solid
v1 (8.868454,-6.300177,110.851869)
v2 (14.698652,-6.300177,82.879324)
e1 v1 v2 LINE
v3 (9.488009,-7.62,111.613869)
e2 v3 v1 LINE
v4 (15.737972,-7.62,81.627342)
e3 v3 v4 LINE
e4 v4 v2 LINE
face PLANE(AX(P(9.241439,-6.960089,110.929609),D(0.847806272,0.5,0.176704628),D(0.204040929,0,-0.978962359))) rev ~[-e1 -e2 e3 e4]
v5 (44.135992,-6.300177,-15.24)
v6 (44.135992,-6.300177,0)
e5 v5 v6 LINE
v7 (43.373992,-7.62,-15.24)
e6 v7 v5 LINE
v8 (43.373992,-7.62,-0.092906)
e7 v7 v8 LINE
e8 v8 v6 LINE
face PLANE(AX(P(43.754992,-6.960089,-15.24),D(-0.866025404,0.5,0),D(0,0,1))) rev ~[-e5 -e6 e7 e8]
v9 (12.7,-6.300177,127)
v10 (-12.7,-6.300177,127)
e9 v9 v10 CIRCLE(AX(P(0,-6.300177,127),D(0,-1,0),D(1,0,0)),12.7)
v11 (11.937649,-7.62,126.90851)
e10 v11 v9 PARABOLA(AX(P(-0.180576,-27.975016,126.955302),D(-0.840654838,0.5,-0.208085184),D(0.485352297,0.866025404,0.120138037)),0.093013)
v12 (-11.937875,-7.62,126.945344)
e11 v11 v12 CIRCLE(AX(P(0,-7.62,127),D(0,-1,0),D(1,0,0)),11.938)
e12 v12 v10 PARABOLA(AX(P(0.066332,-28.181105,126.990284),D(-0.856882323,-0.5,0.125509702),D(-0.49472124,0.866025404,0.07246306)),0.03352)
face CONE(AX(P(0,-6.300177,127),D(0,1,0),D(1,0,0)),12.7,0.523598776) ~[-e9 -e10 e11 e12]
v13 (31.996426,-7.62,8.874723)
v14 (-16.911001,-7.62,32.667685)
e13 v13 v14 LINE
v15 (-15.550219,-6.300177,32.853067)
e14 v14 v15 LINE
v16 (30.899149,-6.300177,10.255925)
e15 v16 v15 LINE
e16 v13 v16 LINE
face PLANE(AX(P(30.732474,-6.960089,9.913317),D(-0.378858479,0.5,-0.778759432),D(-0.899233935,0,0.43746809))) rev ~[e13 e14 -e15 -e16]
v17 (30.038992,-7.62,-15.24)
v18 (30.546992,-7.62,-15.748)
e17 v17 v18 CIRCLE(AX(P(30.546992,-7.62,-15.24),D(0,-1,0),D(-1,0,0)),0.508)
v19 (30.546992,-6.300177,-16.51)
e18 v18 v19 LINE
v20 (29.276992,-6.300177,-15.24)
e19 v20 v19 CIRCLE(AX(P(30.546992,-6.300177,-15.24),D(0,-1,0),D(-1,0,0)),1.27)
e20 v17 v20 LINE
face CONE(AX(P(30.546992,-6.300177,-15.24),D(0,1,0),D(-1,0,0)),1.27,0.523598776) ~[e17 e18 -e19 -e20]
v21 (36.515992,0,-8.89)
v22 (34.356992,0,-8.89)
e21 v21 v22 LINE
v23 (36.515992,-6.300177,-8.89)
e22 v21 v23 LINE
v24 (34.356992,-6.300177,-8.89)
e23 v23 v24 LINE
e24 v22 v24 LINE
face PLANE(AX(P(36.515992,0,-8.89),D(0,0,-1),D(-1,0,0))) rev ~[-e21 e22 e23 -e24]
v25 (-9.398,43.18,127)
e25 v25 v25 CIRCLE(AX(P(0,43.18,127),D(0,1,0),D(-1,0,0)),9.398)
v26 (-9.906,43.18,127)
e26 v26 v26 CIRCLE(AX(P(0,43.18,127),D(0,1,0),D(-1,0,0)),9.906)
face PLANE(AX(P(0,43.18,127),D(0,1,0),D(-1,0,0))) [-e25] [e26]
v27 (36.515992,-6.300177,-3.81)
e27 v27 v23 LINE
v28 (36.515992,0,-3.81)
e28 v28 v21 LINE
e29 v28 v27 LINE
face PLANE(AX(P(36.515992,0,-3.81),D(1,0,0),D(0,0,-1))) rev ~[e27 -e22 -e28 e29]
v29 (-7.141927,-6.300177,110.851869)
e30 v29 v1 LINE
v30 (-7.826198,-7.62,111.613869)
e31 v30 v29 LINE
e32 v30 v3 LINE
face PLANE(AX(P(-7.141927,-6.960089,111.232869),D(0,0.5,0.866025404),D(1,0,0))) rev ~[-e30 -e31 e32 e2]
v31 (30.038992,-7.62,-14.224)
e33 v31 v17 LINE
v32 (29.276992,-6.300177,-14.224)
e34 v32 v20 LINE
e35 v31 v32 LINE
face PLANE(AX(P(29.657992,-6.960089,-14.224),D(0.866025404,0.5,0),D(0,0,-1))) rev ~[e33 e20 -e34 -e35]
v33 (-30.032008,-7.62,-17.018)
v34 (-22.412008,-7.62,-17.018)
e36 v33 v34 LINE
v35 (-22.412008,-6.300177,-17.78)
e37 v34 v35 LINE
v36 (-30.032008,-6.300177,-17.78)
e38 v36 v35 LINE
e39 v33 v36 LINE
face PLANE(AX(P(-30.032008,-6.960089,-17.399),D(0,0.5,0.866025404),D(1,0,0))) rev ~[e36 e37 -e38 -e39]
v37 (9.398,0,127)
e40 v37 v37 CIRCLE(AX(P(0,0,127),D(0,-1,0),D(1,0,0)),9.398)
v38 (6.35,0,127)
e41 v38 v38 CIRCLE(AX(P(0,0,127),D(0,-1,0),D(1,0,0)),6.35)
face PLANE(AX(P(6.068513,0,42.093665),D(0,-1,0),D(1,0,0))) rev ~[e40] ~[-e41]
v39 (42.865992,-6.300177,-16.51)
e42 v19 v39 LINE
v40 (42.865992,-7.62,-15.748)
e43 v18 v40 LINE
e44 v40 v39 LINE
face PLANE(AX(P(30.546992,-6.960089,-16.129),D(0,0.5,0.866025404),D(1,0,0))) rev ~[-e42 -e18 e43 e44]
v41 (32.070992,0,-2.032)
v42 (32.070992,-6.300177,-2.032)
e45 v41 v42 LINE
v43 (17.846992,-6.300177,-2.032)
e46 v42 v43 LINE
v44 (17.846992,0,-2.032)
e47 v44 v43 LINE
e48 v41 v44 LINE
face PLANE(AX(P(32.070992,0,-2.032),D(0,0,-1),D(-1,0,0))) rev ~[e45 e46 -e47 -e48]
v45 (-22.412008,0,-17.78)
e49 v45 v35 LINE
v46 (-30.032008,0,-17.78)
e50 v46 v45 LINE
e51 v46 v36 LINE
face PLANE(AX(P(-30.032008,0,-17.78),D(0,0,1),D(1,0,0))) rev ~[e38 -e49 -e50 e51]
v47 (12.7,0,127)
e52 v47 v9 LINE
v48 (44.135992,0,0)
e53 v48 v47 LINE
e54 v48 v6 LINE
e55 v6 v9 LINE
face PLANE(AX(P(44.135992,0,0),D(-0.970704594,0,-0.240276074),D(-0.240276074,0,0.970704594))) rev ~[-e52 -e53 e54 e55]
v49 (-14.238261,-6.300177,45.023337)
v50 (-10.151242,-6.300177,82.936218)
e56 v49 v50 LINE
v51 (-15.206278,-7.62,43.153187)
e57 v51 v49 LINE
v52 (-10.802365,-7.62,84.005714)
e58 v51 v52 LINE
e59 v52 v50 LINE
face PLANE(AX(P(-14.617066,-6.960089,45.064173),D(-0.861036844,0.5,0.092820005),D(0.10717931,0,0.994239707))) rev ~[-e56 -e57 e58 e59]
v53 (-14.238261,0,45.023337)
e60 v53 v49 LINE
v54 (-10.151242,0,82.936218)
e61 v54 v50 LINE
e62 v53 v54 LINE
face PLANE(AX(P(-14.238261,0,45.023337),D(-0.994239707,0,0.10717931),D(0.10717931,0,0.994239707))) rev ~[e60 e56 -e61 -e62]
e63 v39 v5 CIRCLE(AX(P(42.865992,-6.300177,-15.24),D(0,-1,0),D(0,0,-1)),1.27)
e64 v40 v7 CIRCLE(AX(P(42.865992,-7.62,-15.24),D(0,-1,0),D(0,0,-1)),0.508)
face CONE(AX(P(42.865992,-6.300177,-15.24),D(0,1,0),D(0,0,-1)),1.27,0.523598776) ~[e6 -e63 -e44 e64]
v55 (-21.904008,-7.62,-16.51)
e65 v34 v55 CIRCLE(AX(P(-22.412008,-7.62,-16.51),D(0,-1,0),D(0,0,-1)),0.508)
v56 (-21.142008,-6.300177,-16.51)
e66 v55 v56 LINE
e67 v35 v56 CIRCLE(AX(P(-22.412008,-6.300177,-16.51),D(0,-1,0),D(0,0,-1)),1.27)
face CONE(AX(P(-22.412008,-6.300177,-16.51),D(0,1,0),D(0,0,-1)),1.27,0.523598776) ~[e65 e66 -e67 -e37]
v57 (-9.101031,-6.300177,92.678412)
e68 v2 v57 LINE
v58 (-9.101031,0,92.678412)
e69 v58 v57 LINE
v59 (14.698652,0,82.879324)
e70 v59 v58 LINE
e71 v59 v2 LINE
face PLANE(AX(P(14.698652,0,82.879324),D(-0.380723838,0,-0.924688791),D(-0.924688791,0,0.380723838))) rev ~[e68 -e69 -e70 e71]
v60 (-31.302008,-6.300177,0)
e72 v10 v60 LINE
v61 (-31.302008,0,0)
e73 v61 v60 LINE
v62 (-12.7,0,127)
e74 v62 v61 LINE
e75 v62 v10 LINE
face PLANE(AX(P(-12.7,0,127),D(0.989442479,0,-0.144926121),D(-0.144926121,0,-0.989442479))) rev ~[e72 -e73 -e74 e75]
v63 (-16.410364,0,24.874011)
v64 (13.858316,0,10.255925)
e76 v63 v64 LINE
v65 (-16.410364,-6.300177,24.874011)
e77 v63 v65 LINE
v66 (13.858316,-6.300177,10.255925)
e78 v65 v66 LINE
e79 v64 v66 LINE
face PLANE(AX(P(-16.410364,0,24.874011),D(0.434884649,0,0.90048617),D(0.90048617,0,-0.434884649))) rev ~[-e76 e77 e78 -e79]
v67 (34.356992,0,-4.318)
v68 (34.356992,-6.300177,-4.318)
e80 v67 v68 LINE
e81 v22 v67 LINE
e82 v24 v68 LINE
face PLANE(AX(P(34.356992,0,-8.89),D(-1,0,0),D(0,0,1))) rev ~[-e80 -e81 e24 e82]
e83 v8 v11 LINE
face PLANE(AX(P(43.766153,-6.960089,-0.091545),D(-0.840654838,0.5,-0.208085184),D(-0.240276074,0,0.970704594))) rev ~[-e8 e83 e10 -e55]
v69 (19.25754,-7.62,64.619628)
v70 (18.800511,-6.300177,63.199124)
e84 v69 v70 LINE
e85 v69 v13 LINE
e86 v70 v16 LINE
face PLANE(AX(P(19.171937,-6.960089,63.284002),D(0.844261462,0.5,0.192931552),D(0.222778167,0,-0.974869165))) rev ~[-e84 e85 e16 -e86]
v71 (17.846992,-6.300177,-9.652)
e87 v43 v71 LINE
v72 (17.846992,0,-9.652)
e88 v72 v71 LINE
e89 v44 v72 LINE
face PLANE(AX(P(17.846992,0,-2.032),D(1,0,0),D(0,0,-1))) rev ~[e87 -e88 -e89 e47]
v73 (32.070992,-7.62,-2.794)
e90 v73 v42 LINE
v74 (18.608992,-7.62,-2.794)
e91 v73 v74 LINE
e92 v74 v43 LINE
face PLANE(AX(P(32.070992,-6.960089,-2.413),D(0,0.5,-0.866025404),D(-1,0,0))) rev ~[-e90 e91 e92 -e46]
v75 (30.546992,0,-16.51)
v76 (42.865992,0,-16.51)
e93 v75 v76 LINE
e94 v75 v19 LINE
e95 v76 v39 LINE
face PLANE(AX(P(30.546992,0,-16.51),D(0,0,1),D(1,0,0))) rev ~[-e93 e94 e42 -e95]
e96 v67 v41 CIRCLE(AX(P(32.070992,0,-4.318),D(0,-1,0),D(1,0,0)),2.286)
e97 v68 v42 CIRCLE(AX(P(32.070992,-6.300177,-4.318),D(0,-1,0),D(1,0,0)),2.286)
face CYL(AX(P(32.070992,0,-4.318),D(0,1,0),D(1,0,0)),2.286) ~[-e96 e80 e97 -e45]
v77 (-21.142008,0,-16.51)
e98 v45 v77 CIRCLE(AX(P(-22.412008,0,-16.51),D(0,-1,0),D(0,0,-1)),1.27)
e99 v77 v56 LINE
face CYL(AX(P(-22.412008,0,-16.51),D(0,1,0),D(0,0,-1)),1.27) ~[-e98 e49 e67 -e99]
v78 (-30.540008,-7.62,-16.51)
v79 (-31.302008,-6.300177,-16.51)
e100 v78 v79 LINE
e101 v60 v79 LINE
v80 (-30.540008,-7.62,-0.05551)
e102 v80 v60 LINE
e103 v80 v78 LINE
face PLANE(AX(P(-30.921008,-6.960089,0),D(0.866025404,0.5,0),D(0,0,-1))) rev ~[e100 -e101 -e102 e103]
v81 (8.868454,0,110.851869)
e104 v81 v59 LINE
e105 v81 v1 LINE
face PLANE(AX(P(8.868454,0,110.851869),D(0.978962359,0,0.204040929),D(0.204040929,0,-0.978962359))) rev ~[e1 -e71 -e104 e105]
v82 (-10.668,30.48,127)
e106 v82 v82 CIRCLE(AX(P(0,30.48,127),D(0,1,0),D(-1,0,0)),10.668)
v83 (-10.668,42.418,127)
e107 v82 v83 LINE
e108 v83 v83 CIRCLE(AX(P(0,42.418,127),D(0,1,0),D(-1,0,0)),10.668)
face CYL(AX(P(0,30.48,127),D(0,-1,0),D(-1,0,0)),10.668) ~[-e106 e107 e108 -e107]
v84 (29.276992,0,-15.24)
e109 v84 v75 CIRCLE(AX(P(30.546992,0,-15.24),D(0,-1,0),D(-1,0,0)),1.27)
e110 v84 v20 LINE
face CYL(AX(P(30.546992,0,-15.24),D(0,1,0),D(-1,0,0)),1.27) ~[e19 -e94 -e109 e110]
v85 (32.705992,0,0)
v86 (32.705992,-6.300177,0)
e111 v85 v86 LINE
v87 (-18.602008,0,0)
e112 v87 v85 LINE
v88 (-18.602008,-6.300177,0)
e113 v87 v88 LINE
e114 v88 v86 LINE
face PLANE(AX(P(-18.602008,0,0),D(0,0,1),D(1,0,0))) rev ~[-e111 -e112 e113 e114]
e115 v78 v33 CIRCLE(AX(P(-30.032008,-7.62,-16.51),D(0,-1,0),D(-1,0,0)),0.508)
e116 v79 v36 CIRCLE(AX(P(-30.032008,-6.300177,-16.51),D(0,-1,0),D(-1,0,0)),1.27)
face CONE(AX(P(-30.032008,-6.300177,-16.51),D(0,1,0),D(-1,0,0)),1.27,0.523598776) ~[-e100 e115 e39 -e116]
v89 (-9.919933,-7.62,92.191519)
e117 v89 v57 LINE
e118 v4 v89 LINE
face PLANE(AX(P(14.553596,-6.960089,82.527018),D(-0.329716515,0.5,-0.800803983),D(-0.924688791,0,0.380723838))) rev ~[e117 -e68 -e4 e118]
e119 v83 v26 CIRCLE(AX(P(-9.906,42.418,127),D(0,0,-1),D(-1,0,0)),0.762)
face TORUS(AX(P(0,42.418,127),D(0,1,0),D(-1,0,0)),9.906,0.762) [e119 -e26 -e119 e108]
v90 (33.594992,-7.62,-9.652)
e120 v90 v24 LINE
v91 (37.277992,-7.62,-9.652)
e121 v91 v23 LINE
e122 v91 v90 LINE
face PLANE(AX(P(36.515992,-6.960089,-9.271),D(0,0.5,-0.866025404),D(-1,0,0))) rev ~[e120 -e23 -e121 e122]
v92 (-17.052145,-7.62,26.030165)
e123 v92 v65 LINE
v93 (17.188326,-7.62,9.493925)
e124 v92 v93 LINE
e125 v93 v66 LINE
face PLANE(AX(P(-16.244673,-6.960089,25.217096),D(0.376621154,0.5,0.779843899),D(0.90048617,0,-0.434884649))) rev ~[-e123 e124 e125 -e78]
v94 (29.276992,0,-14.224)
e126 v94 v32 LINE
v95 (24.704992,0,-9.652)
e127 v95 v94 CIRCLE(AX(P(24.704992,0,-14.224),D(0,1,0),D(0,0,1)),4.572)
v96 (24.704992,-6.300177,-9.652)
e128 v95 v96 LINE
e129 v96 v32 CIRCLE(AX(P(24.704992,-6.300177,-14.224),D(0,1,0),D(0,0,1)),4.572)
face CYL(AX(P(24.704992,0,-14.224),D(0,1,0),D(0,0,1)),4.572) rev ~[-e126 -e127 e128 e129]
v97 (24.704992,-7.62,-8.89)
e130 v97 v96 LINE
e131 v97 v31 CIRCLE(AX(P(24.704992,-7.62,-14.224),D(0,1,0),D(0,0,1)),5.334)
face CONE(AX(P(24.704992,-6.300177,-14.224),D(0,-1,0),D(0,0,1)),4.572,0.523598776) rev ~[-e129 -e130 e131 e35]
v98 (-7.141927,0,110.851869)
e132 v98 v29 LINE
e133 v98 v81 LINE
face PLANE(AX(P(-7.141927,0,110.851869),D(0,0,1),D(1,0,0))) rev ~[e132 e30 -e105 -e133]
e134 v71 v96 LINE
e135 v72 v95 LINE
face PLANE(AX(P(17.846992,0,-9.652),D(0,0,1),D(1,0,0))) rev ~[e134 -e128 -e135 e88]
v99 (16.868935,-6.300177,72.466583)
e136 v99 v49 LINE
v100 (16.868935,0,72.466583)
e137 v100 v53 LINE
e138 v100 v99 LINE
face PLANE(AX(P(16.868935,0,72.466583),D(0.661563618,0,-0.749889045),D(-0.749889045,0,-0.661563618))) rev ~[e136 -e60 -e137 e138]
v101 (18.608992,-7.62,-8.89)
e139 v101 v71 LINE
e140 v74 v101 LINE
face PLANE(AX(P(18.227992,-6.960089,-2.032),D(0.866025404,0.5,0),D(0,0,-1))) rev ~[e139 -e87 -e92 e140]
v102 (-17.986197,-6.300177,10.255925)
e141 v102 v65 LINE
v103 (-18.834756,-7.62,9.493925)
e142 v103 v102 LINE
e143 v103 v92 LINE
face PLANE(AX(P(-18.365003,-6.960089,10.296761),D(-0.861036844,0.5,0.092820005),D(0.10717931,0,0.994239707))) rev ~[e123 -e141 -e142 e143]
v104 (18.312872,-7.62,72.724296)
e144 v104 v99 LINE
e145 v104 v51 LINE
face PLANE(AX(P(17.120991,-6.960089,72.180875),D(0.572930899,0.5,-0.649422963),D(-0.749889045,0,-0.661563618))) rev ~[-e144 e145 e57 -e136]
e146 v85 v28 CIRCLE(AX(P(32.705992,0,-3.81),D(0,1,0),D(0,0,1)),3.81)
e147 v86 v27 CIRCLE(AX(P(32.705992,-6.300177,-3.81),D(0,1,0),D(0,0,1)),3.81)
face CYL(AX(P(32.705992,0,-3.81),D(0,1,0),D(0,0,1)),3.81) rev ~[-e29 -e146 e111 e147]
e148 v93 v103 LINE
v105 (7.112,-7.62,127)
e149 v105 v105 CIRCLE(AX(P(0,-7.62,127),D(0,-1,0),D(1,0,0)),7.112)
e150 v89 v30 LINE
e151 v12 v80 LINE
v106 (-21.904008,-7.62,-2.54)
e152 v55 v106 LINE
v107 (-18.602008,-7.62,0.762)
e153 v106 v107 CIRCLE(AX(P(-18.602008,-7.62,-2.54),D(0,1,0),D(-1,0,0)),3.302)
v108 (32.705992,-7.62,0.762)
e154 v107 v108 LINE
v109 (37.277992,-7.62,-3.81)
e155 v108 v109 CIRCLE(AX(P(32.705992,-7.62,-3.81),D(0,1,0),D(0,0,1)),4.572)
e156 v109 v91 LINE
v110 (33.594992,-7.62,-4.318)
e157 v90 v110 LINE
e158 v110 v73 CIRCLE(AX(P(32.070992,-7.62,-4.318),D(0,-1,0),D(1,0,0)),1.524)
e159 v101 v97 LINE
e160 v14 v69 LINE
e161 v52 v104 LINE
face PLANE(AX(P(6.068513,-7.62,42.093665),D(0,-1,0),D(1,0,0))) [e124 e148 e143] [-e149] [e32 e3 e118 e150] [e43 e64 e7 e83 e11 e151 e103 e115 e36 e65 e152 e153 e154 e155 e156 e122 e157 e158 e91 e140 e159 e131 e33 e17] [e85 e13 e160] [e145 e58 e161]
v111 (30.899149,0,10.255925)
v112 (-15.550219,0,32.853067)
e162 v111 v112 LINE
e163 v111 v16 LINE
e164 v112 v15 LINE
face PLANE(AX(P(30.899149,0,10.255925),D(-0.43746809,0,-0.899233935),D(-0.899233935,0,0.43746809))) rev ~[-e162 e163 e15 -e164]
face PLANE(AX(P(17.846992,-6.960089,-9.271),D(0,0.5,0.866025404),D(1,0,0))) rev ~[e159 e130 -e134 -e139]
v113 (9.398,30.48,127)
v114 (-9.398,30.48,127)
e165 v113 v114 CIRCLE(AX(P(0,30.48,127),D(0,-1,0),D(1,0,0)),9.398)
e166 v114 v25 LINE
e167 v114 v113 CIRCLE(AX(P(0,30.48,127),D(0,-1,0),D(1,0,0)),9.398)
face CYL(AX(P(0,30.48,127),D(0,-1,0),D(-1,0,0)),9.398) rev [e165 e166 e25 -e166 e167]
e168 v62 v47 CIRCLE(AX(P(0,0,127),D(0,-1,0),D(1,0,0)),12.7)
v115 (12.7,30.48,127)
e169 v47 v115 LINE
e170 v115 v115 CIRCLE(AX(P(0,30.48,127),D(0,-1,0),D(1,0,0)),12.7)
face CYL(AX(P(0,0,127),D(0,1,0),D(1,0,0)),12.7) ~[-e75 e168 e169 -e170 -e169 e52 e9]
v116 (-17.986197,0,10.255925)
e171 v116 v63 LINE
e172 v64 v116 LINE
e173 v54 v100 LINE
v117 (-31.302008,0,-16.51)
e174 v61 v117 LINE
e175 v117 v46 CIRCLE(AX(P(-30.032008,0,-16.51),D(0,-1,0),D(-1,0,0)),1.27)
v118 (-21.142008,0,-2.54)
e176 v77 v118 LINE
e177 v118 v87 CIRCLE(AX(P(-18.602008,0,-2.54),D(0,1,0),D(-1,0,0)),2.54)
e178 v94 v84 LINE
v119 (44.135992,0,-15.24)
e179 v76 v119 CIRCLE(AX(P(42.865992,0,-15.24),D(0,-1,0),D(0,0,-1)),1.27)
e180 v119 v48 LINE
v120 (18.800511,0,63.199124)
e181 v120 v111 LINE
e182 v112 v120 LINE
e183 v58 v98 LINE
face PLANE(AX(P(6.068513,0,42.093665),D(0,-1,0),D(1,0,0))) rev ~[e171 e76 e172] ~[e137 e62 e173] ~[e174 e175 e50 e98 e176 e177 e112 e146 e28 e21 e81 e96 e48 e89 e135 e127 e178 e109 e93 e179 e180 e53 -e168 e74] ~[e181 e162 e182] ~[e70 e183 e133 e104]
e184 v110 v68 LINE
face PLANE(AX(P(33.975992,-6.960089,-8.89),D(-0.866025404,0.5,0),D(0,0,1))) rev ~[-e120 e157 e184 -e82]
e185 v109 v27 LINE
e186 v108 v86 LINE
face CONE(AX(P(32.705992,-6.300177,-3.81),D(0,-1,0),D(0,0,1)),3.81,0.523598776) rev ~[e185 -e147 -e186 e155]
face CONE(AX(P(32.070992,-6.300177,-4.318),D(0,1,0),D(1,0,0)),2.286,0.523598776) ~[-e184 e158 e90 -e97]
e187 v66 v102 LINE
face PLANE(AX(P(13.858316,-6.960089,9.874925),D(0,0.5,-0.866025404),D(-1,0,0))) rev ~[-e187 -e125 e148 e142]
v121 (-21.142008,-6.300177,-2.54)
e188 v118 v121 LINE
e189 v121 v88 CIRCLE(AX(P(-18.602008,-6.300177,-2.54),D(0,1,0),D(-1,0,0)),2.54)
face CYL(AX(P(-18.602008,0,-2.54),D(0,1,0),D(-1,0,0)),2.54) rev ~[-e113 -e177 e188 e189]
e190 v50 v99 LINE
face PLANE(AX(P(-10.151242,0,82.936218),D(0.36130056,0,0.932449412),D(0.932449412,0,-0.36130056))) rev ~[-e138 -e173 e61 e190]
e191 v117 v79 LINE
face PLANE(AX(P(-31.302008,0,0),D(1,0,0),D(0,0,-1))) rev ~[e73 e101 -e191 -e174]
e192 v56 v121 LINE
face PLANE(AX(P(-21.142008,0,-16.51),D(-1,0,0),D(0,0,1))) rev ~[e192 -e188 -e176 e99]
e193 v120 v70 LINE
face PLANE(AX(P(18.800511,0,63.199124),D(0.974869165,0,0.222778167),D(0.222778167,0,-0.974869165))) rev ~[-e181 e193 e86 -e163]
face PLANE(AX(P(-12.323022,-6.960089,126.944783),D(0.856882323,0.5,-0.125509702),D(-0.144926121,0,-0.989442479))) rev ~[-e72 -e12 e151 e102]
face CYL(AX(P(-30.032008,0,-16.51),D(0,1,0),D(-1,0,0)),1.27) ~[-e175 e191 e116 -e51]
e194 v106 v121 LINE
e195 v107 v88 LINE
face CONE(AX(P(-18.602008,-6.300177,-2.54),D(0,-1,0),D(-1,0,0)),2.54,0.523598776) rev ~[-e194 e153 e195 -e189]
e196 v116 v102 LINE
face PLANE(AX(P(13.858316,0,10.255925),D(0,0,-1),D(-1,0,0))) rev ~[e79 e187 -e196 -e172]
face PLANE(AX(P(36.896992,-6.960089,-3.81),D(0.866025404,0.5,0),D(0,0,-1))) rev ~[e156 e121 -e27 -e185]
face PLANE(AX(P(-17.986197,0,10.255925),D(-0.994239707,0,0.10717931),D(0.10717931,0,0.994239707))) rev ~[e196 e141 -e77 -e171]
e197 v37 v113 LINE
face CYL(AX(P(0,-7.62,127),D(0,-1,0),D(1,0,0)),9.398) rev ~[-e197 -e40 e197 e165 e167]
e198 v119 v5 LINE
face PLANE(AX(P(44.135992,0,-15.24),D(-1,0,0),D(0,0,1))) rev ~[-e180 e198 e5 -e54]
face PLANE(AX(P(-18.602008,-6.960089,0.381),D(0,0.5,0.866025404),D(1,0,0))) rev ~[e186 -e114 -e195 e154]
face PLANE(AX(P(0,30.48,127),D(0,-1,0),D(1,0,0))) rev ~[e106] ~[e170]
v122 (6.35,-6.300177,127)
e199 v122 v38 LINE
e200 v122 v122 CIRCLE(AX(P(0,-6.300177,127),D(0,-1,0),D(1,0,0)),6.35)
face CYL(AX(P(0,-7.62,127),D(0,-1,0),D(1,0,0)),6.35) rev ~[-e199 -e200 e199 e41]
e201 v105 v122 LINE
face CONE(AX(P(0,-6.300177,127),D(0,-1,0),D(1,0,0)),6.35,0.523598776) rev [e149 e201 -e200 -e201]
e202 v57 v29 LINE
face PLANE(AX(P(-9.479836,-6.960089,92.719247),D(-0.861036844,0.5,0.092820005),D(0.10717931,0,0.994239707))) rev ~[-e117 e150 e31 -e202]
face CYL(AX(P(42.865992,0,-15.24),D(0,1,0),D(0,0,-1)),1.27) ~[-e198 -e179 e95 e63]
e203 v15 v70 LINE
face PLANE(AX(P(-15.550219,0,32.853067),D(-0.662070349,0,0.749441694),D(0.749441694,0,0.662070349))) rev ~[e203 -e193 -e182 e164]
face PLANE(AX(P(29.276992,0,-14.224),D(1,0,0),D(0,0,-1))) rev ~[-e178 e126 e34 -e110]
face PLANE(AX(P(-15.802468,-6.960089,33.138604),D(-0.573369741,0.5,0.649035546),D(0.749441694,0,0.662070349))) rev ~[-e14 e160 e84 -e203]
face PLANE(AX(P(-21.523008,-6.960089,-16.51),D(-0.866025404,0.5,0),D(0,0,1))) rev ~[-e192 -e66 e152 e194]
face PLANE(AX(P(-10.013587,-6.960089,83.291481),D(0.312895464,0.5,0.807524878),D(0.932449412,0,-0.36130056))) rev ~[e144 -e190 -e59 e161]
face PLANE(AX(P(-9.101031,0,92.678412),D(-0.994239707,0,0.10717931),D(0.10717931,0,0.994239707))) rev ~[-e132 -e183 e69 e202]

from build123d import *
from build123d import SkipClean  # not in build123d's __all__

# Parameters (mm, degrees)
F1_DEPTH = 7.62
F2_R     = 12.7
F2_R_2   = 9.398
F3_DEPTH = 38.1
F4_R     = 10.668
F4_R_2   = 9.398
F5_DEPTH = 12.7
F6_R     = 6.35
F7_DEPTH = 25.4
F8_SIZE2 = 1.3198227154
F8_SIZE  = 0.762
F9_R     = 0.762


# Not quite as in the source:
# - after a boolean that leaves OpenCascade's solid faulty, fix() repairs it


with BuildPart() as f1:
    # F0 (on Front) → F1 (new body)
    with BuildSketch(Plane.XZ):
        with BuildLine():
            ThreePointArc((-21.1420084076, -2.54), (-20.3980596318, -0.7439487758), (-18.6020084076, 0))
            Line((-18.6020084076, 0), (32.7059915924, 0))
            ThreePointArc((32.7059915924, 0), (35.4000684287, -1.1159231637), (36.5159915924, -3.81))
            Line((36.5159915924, -3.81), (36.5159915924, -8.89))
            Line((36.5159915924, -8.89), (34.3569915924, -8.89))
            Line((34.3569915924, -8.89), (34.3569915924, -4.318))
            ThreePointArc((34.3569915924, -4.318), (33.6874376942, -2.7015538982), (32.0709915924, -2.032))
            Line((32.0709915924, -2.032), (29.2769915924, -2.032))
            Line((29.2769915924, -2.032), (17.8469915924, -2.032))
            Line((17.8469915924, -2.032), (17.8469915924, -9.652))
            Line((17.8469915924, -9.652), (24.7049915924, -9.652))
            ThreePointArc((24.7049915924, -9.652), (27.937883796, -10.9911077964), (29.2769915924, -14.224))
            Line((29.2769915924, -14.224), (29.2769915924, -15.24))
            ThreePointArc((29.2769915924, -15.24), (29.6489659803, -16.1380256121), (30.5469915924, -16.51))
            Line((30.5469915924, -16.51), (42.8659915924, -16.51))
            ThreePointArc((42.8659915924, -16.51), (43.7640172045, -16.1380256121), (44.1359915924, -15.24))
            Line((44.1359915924, -15.24), (44.1359915924, 0))
            Line((44.1359915924, 0), (12.7, 127))
            ThreePointArc((12.7, 127), (0, 139.7), (-12.7, 127))
            Line((-12.7, 127), (-31.3020084076, 0))
            Line((-31.3020084076, 0), (-31.3020084076, -16.51))
            ThreePointArc((-31.3020084076, -16.51), (-30.9300340197, -17.4080256121), (-30.0320084076, -17.78))
            Line((-30.0320084076, -17.78), (-22.4120084076, -17.78))
            ThreePointArc((-22.4120084076, -17.78), (-21.5139827955, -17.4080256121), (-21.1420084076, -16.51))
            Line((-21.1420084076, -16.51), (-21.1420084076, -2.54))
        make_face()
        Polygon((13.8583155349, 10.2559253573), (-17.4904800951, 10.2559253573), (-17.9861974368, 10.2559253573), (-16.4103638381, 24.8740110546), align=None, mode=Mode.SUBTRACT)
        Polygon((30.8991490559, 10.2559253573), (-15.5502194539, 32.8530669212), (18.8005114427, 63.1991239488), align=None, mode=Mode.SUBTRACT)
        Polygon((16.8689347681, 72.4665825348), (-14.2382610105, 45.0233372929), (-10.1512422372, 82.9362176403), align=None, mode=Mode.SUBTRACT)
        Polygon((-7.1419274588, 110.8518689871), (8.8684540242, 110.8518689871), (14.6986516415, 82.8793242388), (-9.1010310551, 92.6784119132), align=None, mode=Mode.SUBTRACT)
    extrude(amount=F1_DEPTH)

    # F2 (on face) → F3 (join)
    with BuildSketch(Plane.XZ.offset(7.62)):
        with Locations((0, 127)):
            Circle(F2_R)
        with Locations((0, 127)):
            Circle(F2_R_2, mode=Mode.SUBTRACT)
    extrude(amount=-F3_DEPTH)

    # F4 (on face) → F5 (join)
    with BuildSketch(Plane(origin=(0, 30.48, 0), x_dir=(-1, 0, 0), z_dir=(0, 1, 0))):
        with Locations((0, 127)):
            Circle(F4_R)
        with Locations((0, 127)):
            Circle(F4_R_2, mode=Mode.SUBTRACT)
    with SkipClean():  # cleaning this boolean's faces spoils the solid; the shape is the same uncleaned
        extrude(amount=F5_DEPTH)

    # F6 (on face) → F7 (cut)
    with BuildSketch(Plane.XZ.offset(7.62)):
        with Locations((0, 127)):
            Circle(F6_R)
    extrude(amount=-F7_DEPTH, mode=Mode.SUBTRACT)

    add(f1.part.fix(), mode=Mode.REPLACE)

    # F8
    f8_edges = [f1.edges().sort_by_distance(p)[0] for p in [
        (-22.001004, -7.62, 63.5),
        (-31.302008, -7.62, -8.255),
        (-30.930034, -7.62, -17.408026),
        (-26.222008, -7.62, -17.78),
        (-21.513983, -7.62, -17.408026),
        (-21.142008, -7.62, -9.525),
        (-20.39806, -7.62, -0.743949),
        (7.051992, -7.62, 0),
        (35.400068, -7.62, -1.115923),
        (36.515992, -7.62, -6.35),
        (35.436492, -7.62, -8.89),
        (34.356992, -7.62, -6.604),
        (33.687438, -7.62, -2.701554),
        (24.958992, -7.62, -2.032),
        (17.846992, -7.62, -5.842),
        (21.275992, -7.62, -9.652),
        (27.937884, -7.62, -10.991108),
        (29.276992, -7.62, -14.732),
        (29.648966, -7.62, -16.138026),
        (36.706492, -7.62, -16.51),
        (43.764017, -7.62, -16.138026),
        (44.135992, -7.62, -7.62),
        (28.417996, -7.62, 63.5),
        (0, -7.62, 139.7),
        (-17.198281, -7.62, 17.564968),
        (-1.276024, -7.62, 17.564968),
        (-2.063941, -7.62, 10.255925),
        (1.315337, -7.62, 58.74496),
        (-12.194752, -7.62, 63.979777),
        (3.358846, -7.62, 77.7014),
        (24.84983, -7.62, 36.727525),
        (7.674465, -7.62, 21.554496),
        (1.625146, -7.62, 48.026095),
        (0.863263, -7.62, 110.851869),
        (11.783553, -7.62, 96.865597),
        (2.79881, -7.62, 87.778868),
        (-8.121479, -7.62, 101.76514),
        (-6.35, -7.62, 127),
    ]]
    f8_side = f1.faces().sort_by_distance((-20.273277, -7.62, 63.246935))[0]
    chamfer(f8_edges, length=F8_SIZE, length2=F8_SIZE2, reference=f8_side)

    # F9
    f9_edges = [f1.edges().sort_by_distance(p)[0] for p in [
        (10.668, 43.18, 127),
    ]]
    fillet(f9_edges, radius=F9_R)


solid = f1.part
